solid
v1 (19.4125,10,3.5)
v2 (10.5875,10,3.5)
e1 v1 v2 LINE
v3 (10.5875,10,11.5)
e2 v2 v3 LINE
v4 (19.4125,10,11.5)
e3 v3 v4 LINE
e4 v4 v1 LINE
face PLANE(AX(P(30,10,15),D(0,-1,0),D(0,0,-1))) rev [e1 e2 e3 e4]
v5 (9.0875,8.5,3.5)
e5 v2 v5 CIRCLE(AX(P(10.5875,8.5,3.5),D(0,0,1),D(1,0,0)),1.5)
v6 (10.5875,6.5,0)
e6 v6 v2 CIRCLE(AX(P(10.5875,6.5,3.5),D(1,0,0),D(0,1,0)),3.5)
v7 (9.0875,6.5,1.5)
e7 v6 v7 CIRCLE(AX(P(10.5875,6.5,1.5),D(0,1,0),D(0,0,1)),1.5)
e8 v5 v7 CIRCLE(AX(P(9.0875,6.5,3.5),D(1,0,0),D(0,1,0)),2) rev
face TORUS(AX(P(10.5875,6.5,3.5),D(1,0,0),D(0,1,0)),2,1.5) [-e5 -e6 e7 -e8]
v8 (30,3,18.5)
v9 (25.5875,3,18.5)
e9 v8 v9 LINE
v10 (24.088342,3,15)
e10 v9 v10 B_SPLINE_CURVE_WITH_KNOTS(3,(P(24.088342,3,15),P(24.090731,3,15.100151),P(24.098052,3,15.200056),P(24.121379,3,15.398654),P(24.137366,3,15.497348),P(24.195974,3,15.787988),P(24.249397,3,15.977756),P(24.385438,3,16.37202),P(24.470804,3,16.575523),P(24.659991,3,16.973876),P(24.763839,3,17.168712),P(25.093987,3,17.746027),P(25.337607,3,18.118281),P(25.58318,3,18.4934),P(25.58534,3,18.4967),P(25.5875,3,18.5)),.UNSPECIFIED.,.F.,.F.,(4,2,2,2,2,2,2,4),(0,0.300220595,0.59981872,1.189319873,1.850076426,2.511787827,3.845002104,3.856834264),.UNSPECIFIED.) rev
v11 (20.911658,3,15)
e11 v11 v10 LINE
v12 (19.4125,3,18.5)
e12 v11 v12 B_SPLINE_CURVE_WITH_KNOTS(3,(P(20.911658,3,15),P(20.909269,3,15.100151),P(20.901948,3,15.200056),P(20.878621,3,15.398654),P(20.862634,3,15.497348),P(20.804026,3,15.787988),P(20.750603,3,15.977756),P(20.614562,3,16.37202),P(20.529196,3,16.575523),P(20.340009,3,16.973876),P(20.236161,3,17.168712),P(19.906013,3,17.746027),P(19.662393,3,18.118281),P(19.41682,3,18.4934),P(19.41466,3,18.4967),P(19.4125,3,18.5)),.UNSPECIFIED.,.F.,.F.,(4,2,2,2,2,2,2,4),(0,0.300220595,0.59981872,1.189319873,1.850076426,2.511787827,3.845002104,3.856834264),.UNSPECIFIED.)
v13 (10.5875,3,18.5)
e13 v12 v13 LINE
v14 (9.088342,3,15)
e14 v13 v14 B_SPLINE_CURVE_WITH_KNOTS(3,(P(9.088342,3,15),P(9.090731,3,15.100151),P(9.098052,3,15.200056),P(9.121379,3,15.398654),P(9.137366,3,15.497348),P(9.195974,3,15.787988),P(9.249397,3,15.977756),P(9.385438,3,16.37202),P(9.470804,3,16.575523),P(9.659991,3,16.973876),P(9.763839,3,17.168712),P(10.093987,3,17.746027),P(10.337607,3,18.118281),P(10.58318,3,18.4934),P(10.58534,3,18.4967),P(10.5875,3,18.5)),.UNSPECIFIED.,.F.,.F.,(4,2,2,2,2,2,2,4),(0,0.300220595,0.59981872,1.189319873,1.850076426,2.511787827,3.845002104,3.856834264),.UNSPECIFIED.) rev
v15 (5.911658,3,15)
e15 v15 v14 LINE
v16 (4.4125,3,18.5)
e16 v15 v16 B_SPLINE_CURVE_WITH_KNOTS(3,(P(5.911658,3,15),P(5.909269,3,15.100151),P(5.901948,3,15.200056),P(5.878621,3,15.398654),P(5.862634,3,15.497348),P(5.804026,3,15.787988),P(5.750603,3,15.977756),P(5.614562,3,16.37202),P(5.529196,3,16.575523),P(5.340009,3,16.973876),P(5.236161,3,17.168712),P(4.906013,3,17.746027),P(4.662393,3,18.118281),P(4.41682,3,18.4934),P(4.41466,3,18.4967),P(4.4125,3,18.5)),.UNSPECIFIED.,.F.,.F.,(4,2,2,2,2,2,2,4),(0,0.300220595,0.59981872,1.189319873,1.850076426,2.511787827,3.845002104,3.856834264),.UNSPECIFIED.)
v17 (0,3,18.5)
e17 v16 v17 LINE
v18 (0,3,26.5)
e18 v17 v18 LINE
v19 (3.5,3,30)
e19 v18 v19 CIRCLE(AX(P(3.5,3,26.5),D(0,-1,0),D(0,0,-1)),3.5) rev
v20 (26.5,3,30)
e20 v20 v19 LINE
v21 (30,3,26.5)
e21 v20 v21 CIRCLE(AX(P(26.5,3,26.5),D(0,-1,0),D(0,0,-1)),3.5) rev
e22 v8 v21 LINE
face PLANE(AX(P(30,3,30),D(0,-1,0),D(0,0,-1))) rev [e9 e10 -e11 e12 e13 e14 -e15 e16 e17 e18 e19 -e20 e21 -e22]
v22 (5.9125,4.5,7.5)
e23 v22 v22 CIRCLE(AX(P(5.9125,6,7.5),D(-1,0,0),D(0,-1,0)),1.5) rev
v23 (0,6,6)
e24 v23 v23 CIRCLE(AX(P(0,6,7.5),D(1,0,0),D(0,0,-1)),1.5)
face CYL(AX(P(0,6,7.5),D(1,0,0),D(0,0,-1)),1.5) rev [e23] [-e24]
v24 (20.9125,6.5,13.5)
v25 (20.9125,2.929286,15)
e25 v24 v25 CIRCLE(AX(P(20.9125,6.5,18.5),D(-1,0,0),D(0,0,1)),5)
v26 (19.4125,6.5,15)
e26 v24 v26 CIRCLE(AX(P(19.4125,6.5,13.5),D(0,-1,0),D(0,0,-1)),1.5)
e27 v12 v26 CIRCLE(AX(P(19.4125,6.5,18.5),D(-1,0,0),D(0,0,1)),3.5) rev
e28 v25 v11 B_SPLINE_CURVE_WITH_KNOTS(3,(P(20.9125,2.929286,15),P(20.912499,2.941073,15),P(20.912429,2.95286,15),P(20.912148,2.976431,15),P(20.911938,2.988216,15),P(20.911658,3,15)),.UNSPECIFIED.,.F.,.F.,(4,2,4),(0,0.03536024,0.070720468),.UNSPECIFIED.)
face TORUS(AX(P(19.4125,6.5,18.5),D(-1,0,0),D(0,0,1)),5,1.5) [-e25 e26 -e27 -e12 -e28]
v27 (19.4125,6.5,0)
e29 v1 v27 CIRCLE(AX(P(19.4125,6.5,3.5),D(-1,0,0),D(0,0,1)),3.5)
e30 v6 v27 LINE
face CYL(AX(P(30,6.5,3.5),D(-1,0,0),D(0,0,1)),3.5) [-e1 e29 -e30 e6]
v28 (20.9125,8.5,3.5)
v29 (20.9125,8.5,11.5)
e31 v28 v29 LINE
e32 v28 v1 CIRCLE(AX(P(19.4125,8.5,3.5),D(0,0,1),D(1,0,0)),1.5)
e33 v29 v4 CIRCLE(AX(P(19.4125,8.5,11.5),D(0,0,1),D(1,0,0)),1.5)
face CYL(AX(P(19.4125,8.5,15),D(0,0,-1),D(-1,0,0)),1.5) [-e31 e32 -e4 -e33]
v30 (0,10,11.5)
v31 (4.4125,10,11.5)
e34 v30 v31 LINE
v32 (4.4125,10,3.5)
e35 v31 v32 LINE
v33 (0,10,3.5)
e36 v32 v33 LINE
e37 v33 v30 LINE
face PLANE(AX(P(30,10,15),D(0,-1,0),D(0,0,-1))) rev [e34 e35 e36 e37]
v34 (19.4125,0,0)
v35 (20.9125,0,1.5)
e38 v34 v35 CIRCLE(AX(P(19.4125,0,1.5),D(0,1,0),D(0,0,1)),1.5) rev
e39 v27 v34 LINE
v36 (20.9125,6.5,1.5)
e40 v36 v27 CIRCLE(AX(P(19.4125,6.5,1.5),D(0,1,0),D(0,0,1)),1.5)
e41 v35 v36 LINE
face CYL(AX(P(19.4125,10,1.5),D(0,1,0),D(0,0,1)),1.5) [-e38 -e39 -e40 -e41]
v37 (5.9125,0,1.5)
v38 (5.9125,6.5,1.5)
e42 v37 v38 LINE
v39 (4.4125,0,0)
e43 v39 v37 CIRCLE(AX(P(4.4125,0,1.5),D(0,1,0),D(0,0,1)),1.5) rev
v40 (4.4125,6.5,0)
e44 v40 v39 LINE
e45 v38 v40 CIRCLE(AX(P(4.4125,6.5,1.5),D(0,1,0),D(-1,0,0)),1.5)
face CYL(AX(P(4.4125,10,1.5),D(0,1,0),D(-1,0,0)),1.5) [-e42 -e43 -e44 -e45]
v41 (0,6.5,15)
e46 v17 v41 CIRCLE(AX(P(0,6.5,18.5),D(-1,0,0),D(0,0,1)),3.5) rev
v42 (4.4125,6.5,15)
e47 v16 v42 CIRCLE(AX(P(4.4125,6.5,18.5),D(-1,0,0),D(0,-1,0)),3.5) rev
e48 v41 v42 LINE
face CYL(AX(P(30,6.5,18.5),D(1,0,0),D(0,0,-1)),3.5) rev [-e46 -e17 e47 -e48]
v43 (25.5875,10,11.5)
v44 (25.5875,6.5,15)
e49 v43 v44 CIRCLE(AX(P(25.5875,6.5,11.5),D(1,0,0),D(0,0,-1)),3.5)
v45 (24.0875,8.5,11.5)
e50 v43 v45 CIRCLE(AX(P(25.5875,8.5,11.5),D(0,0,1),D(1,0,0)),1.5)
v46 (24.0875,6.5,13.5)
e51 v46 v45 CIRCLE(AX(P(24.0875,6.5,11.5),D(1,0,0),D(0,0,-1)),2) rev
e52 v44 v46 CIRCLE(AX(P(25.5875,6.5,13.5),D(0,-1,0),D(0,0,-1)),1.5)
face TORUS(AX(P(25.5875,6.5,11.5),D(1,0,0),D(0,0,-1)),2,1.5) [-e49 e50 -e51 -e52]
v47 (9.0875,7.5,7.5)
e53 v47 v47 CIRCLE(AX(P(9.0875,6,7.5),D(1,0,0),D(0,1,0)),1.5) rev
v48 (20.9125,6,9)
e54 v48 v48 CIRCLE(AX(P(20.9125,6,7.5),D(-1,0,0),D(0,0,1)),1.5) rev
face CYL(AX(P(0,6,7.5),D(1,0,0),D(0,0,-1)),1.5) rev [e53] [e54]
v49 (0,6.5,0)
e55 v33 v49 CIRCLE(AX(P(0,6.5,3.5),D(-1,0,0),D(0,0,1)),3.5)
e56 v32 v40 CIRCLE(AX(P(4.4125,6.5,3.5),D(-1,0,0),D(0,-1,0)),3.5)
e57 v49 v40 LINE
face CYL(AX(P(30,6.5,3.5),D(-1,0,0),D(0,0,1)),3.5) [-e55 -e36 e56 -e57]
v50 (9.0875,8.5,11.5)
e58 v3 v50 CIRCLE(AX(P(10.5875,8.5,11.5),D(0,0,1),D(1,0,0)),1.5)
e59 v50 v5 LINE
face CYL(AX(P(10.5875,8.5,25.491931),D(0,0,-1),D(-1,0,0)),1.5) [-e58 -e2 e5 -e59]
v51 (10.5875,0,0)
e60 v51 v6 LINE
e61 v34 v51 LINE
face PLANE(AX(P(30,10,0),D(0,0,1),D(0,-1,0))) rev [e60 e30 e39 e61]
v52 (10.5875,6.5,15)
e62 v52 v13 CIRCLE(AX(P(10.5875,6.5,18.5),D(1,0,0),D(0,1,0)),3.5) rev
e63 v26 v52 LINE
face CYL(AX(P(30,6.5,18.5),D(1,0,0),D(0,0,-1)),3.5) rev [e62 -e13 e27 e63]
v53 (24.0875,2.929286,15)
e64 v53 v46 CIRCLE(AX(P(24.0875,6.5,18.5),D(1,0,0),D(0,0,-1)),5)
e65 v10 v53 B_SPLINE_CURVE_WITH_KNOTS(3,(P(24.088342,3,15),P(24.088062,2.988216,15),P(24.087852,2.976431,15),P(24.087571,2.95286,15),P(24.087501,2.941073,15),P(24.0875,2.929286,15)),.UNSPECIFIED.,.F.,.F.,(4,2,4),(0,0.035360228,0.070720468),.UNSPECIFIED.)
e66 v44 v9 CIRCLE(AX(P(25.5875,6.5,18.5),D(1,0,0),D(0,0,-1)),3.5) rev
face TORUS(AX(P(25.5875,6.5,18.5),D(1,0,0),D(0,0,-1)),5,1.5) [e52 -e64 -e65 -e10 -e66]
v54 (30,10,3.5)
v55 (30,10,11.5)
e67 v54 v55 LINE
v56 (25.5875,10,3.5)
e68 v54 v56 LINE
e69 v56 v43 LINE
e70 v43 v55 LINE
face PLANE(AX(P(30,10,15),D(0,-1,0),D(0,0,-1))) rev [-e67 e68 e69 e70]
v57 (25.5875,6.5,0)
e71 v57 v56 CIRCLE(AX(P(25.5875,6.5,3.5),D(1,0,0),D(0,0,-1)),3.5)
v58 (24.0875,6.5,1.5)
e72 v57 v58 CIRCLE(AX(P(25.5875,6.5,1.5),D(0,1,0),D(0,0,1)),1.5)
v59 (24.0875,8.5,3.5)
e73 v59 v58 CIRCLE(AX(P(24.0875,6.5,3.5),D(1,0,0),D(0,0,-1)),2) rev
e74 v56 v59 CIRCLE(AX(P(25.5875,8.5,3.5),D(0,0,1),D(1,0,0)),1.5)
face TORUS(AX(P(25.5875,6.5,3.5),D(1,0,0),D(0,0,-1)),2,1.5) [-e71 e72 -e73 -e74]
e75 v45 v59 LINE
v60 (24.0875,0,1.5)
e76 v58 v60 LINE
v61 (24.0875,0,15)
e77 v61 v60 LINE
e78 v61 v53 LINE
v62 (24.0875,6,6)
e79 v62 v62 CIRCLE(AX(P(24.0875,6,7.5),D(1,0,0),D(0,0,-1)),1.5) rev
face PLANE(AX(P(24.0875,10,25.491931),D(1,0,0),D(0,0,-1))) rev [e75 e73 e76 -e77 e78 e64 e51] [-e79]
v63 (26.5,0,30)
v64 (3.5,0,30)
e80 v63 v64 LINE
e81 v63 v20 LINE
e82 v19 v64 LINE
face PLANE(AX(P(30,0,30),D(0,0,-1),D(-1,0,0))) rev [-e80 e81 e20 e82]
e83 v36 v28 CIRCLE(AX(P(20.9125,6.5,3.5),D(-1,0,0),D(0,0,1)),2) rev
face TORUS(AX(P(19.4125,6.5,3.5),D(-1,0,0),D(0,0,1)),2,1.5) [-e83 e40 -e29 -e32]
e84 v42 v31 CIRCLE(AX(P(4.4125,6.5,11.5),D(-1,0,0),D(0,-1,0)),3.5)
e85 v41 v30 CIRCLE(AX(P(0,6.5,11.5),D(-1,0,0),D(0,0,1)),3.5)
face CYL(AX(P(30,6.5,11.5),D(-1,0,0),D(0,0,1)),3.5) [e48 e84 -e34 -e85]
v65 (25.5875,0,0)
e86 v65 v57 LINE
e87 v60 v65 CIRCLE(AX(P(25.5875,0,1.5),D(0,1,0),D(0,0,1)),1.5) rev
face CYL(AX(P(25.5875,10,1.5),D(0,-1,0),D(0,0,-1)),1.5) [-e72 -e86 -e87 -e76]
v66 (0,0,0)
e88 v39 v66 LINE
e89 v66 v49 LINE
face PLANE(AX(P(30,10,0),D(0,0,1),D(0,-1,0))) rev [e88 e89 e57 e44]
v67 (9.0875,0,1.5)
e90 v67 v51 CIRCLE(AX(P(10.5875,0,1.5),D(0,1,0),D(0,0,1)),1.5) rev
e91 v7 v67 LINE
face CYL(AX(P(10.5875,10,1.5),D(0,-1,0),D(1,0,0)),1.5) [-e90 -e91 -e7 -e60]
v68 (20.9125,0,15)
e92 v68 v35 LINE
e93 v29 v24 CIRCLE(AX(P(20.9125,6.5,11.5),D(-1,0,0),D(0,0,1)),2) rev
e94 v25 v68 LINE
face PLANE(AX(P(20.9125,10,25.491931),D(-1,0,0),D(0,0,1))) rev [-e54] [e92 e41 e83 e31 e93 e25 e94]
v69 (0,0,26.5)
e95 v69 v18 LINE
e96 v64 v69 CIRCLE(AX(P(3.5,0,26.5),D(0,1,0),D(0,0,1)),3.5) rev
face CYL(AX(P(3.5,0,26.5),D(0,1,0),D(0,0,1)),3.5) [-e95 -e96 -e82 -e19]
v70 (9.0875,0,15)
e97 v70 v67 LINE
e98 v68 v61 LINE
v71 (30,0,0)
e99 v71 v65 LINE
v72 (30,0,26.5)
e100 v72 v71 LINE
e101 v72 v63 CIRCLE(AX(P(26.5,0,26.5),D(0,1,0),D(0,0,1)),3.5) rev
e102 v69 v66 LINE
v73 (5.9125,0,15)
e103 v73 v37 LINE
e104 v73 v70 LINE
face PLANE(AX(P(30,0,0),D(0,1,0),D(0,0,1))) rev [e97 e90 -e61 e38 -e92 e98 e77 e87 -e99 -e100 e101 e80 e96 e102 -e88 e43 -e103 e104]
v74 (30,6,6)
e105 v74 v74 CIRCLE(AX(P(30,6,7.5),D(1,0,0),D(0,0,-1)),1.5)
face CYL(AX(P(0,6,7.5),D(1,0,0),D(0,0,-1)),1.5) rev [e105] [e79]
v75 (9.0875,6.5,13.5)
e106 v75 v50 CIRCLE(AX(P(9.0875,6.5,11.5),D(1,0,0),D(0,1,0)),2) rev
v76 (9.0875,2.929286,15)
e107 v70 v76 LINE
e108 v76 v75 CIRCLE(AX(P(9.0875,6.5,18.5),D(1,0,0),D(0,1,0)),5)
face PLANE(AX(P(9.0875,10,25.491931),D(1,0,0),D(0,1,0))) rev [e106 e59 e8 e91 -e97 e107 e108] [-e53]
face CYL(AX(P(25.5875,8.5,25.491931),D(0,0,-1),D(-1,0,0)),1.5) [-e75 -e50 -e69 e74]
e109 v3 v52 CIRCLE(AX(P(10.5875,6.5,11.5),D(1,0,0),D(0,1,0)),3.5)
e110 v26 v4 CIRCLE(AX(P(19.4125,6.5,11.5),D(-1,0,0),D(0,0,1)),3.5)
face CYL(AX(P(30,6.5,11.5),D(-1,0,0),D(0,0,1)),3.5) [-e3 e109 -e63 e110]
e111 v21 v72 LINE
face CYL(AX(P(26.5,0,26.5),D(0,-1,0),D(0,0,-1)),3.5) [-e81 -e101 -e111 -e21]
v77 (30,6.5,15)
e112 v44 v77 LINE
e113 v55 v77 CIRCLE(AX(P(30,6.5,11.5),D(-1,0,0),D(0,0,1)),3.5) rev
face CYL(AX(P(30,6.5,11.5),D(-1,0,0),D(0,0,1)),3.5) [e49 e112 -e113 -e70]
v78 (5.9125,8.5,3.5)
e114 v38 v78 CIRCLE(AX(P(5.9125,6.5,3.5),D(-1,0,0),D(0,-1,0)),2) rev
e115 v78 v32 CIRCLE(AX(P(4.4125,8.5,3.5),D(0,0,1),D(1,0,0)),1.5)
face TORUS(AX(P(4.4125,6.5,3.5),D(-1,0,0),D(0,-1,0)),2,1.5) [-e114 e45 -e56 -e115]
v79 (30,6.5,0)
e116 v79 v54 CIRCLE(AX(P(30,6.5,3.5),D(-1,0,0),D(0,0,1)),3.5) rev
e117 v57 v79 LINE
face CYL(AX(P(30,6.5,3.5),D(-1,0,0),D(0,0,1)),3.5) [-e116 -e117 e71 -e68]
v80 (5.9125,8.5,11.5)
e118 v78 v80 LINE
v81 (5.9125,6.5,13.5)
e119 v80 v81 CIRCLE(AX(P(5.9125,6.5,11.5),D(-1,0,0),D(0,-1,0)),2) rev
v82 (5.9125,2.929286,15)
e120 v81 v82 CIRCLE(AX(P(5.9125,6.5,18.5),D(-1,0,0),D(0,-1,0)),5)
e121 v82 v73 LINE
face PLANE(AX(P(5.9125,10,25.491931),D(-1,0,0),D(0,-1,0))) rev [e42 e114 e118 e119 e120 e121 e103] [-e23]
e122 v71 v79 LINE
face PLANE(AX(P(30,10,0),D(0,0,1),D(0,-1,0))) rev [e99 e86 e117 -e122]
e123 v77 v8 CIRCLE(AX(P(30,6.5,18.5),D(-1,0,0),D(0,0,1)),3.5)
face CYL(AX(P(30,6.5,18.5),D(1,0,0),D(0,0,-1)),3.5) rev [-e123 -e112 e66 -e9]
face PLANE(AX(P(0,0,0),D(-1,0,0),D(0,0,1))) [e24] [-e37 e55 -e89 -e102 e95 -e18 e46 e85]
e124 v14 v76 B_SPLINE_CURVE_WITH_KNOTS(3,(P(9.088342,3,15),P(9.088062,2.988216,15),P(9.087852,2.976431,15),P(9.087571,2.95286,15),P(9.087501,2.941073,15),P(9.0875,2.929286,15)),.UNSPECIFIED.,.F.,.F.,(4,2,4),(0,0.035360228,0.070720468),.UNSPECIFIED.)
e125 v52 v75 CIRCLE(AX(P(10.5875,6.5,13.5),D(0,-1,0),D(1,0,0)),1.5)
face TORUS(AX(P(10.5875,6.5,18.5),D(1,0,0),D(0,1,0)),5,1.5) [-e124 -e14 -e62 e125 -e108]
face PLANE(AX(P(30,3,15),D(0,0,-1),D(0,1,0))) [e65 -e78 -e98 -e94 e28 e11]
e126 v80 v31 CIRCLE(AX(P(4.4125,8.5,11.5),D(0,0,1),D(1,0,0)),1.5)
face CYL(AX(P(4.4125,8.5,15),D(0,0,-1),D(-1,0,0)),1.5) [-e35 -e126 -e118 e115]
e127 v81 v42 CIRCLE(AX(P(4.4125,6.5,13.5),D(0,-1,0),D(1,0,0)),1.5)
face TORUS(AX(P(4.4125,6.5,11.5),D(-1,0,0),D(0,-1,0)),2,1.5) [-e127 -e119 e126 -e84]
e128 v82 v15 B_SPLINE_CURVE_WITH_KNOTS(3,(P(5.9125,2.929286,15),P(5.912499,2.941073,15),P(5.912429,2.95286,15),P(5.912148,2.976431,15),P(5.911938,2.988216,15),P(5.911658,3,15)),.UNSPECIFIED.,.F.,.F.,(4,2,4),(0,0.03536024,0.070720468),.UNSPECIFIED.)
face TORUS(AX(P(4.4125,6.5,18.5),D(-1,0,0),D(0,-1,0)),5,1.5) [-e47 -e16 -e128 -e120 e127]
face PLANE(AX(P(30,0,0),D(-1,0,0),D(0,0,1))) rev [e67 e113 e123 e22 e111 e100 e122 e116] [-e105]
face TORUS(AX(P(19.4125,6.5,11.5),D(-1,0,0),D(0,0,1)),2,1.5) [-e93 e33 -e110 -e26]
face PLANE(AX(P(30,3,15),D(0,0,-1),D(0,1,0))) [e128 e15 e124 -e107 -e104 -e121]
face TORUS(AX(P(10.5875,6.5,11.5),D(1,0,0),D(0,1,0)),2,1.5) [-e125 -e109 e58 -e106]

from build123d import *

# Parameters (mm, degrees)
BOSS_EXTRUDE1_DEPTH = 30
SKETCH2_R           = 1.5
CUT_EXTRUDE1_DEPTH  = 44.588989435
CUT_EXTRUDE2_REACH  = 45.589
SKETCH3_W           = 3.175
SKETCH3_H           = 10
FILLET1_R           = 3.5
FILLET2_R           = 1.5


# Some blends are built 0.0001 mm under size
with BuildPart() as part:
    # Sketch1 → Boss-Extrude1 (new body)
    with BuildSketch(Plane(origin=(0, 0, 0), x_dir=(0, 0, -1), z_dir=(1, 0, 0))):
        Polygon((0, 0), (-30, 0), (-30, 3), (-15, 3), (-15, 10), (0, 10), align=None)
    extrude(amount=BOSS_EXTRUDE1_DEPTH)

    # Sketch2 → Cut-Extrude1 (cut, through all)
    with BuildSketch(Plane(origin=(30, 0, 0), x_dir=(0, 0, -1), z_dir=(1, 0, 0))):
        with Locations((-7.5, 6)):
            Circle(SKETCH2_R)
    extrude(amount=-CUT_EXTRUDE1_DEPTH, mode=Mode.SUBTRACT)

    # Cut-Extrude2: up to this face of the body (flat: up to its plane)
    cut_extrude2_end = Plane(part.part.faces().sort_by_distance((15, 6.5, 15))[0])
    # Sketch3 → Cut-Extrude2 (cut, up to the picked face)
    with BuildSketch(Plane(origin=(0, 0, 0), x_dir=(-1, 0, 0), z_dir=(0, 0, -1)), mode=Mode.PRIVATE) as cut_extrude2_sk1:
        with Locations((-7.5, 5)):
            Rectangle(SKETCH3_W, SKETCH3_H)
    cut_extrude2_tool1 = split(extrude(cut_extrude2_sk1.sketch, amount=-CUT_EXTRUDE2_REACH, mode=Mode.PRIVATE), bisect_by=cut_extrude2_end, keep=Keep.BOTH, mode=Mode.PRIVATE)
    # Sketch3 → Cut-Extrude2 (cut, up to the picked face)
    with BuildSketch(Plane(origin=(0, 0, 0), x_dir=(-1, 0, 0), z_dir=(0, 0, -1)), mode=Mode.PRIVATE) as cut_extrude2_sk2:
        with Locations((-22.5, 5)):
            Rectangle(SKETCH3_W, SKETCH3_H)
    cut_extrude2_tool2 = split(extrude(cut_extrude2_sk2.sketch, amount=-CUT_EXTRUDE2_REACH, mode=Mode.PRIVATE), bisect_by=cut_extrude2_end, keep=Keep.BOTH, mode=Mode.PRIVATE)
    add(cut_extrude2_tool1.solids().sort_by(Axis((7.5, 5, 0), (0, 0, 1)))[0], mode=Mode.SUBTRACT)
    add(cut_extrude2_tool2.solids().sort_by(Axis((22.5, 5, 0), (0, 0, 1)))[0], mode=Mode.SUBTRACT)

    # Fillet1
    fillet1_edges = [part.edges().sort_by_distance(p)[0] for p in [
        (0, 1.5, 30),
        (30, 1.5, 30),
        (15, 10, 0),
        (15, 3, 15),
        (15, 10, 15),
        (2.95625, 10, 0),
        (27.04375, 10, 0),
        (2.95625, 10, 15),
        (27.04375, 10, 15),
        (27.04375, 3, 15),
        (2.95625, 3, 15),
    ]]
    fillet(fillet1_edges, radius=FILLET1_R - 0.0001)  # a hair under: the kernel refuses the full size

    # Fillet2
    # the kernel refuses this fillet: 1.5 mm, written as the material it takes off along each edge
    with BuildSketch(Plane(origin=(5.9125, 6.4999, 18.4999), x_dir=(0, -0.4784658161489802, 0.87810617967128), z_dir=(0, 0.87810617967128, 0.4784658161489802))) as fillet2_piece_1_section:
        with BuildLine():
            CenterArc((3.4999 + FILLET2_R, -FILLET2_R), FILLET2_R, 90, 90)
            Line((3.4999, -FILLET2_R), (3.4999, 0))
            Line((3.4999, 0), (3.4999 + FILLET2_R, 0))
        make_face()
    fillet2_piece_1 = revolve(axis=Axis((5.9125, 6.4999, 18.4999), (1, 0, 0)), revolution_arc=151.414750095, mode=Mode.PRIVATE)
    fillet2_piece_1 = split(fillet2_piece_1, bisect_by=Plane(origin=(5.513661533, 3, 15.961303767), z_dir=(0, 1, 0)), keep=Keep.TOP, mode=Mode.PRIVATE)
    add(fillet2_piece_1, mode=Mode.SUBTRACT)
    with BuildSketch(Plane(origin=(5.9125, 6.4999, 18.4999), x_dir=(0, -0.4784658161489802, 0.87810617967128), z_dir=(0, 0.87810617967128, 0.4784658161489802))) as fillet2_piece_2_section:
        with BuildLine():
            CenterArc((3.4999 + FILLET2_R, -FILLET2_R), FILLET2_R, 90, 90)
            Line((3.4999, -FILLET2_R), (3.4999, 0))
            Line((3.4999, 0), (3.4999 + FILLET2_R, 0))
        make_face()
    fillet2_piece_2 = revolve(axis=Axis((5.9125, 6.4999, 18.4999), (1, 0, 0)), revolution_arc=151.414750095, mode=Mode.PRIVATE)
    fillet2_piece_2 = split(fillet2_piece_2, bisect_by=Plane(origin=(5.912331241, 2.985794163, 15), z_dir=(0, 0, -1)), keep=Keep.TOP, mode=Mode.PRIVATE)
    add(fillet2_piece_2, mode=Mode.SUBTRACT)
    with BuildSketch(Plane(origin=(5.9125, 6.5001, 11.5001), x_dir=(0, 1, 0), z_dir=(0, 0, -1))) as fillet2_piece_3:
        with BuildLine():
            CenterArc((3.4999 - FILLET2_R, -FILLET2_R), FILLET2_R, 360, 90)
            Line((3.4999, -FILLET2_R), (3.4999, 0))
            Line((3.4999, 0), (3.4999 - FILLET2_R, 0))
        make_face()
    revolve(axis=Axis((5.9125, 6.5001, 11.5001), (1, 0, 0)), revolution_arc=90, mode=Mode.SUBTRACT)
    with BuildSketch(Plane(origin=(5.9125, 6.5001, 0), x_dir=(-1, 0, 0), z_dir=(0, -1, 0)), Plane(origin=(24.0875, -3.75, 0), x_dir=(1, 0, 0), z_dir=(0, 1, 0)), Plane(origin=(20.9125, 6.5001, 0), x_dir=(-1, 0, 0), z_dir=(0, -1, 0))) as fillet2_piece_4:
        with BuildLine():
            CenterArc((FILLET2_R, -FILLET2_R), FILLET2_R, 90, 90)
            Line((0, -FILLET2_R), (0, 0))
            Line((0, 0), (FILLET2_R, 0))
        make_face()
    extrude(amount=10.2501, mode=Mode.SUBTRACT)
    with BuildSketch(Plane(origin=(5.9125, 6.5001, 3.4999), x_dir=(0, 0, -1), z_dir=(0, -1, 0))) as fillet2_piece_5:
        with BuildLine():
            CenterArc((3.4999 - FILLET2_R, -FILLET2_R), FILLET2_R, 0, 90)
            Line((3.4999, -FILLET2_R), (3.4999, 0))
            Line((3.4999, 0), (3.4999 - FILLET2_R, 0))
        make_face()
    revolve(axis=Axis((5.9125, 6.5001, 3.4999), (1, 0, 0)), revolution_arc=90, mode=Mode.SUBTRACT)
    with BuildSketch(Plane(origin=(9.0875, 6.4999, 18.4999), x_dir=(0, -0.478465816148981, 0.8781061796712796), z_dir=(0, 0.8781061796712796, 0.478465816148981))) as fillet2_piece_6_section:
        with BuildLine():
            CenterArc((3.4999 + FILLET2_R, FILLET2_R), FILLET2_R, 180, 90)
            Line((3.4999, FILLET2_R), (3.4999, 0))
            Line((3.4999, 0), (3.4999 + FILLET2_R, 0))
        make_face()
    fillet2_piece_6 = revolve(axis=Axis((9.0875, 6.4999, 18.4999), (1, 0, 0)), revolution_arc=151.414750095, mode=Mode.PRIVATE)
    fillet2_piece_6 = split(fillet2_piece_6, bisect_by=Plane(origin=(9.486338509, 3, 15.961303608), z_dir=(0, 1, 0)), keep=Keep.TOP, mode=Mode.PRIVATE)
    add(fillet2_piece_6, mode=Mode.SUBTRACT)
    with BuildSketch(Plane(origin=(9.0875, 6.4999, 18.4999), x_dir=(0, -0.478465816148981, 0.8781061796712796), z_dir=(0, 0.8781061796712796, 0.478465816148981))) as fillet2_piece_7_section:
        with BuildLine():
            CenterArc((3.4999 + FILLET2_R, FILLET2_R), FILLET2_R, 180, 90)
            Line((3.4999, FILLET2_R), (3.4999, 0))
            Line((3.4999, 0), (3.4999 + FILLET2_R, 0))
        make_face()
    fillet2_piece_7 = revolve(axis=Axis((9.0875, 6.4999, 18.4999), (1, 0, 0)), revolution_arc=151.414750095, mode=Mode.PRIVATE)
    fillet2_piece_7 = split(fillet2_piece_7, bisect_by=Plane(origin=(9.087668759, 2.985794163, 15), z_dir=(0, 0, -1)), keep=Keep.TOP, mode=Mode.PRIVATE)
    add(fillet2_piece_7, mode=Mode.SUBTRACT)
    with BuildSketch(Plane(origin=(9.0875, 6.5001, 11.5001), x_dir=(0, 1, 0), z_dir=(0, 0, -1))) as fillet2_piece_8:
        with BuildLine():
            CenterArc((3.4999 - FILLET2_R, FILLET2_R), FILLET2_R, 270, 90)
            Line((3.4999, FILLET2_R), (3.4999, 0))
            Line((3.4999, 0), (3.4999 - FILLET2_R, 0))
        make_face()
    revolve(axis=Axis((9.0875, 6.5001, 11.5001), (1, 0, 0)), revolution_arc=90, mode=Mode.SUBTRACT)
    with BuildSketch(Plane(origin=(9.0875, -3.75, 0), x_dir=(0, 0, 1), z_dir=(0, 1, 0))) as fillet2_piece_9:
        with BuildLine():
            CenterArc((FILLET2_R, FILLET2_R), FILLET2_R, 180, 90)
            Line((0, FILLET2_R), (0, 0))
            Line((0, 0), (FILLET2_R, 0))
        make_face()
    extrude(amount=10.2501, mode=Mode.SUBTRACT)
    with BuildSketch(Plane(origin=(9.0875, 6.5001, 3.4999), x_dir=(0, 0, -1), z_dir=(0, -1, 0))) as fillet2_piece_10:
        with BuildLine():
            CenterArc((3.4999 - FILLET2_R, FILLET2_R), FILLET2_R, 270, 90)
            Line((3.4999, FILLET2_R), (3.4999, 0))
            Line((3.4999, 0), (3.4999 - FILLET2_R, 0))
        make_face()
    revolve(axis=Axis((9.0875, 6.5001, 3.4999), (1, 0, 0)), revolution_arc=90, mode=Mode.SUBTRACT)
    with BuildSketch(Plane(origin=(24.0875, 6.4999, 18.4999), x_dir=(0, -0.478465816148981, 0.8781061796712796), z_dir=(0, 0.8781061796712796, 0.478465816148981))) as fillet2_piece_11_section:
        with BuildLine():
            CenterArc((3.4999 + FILLET2_R, FILLET2_R), FILLET2_R, 180, 90)
            Line((3.4999, FILLET2_R), (3.4999, 0))
            Line((3.4999, 0), (3.4999 + FILLET2_R, 0))
        make_face()
    fillet2_piece_11 = revolve(axis=Axis((24.0875, 6.4999, 18.4999), (1, 0, 0)), revolution_arc=151.414750095, mode=Mode.PRIVATE)
    fillet2_piece_11 = split(fillet2_piece_11, bisect_by=Plane(origin=(24.486338467, 3, 15.961303767), z_dir=(0, 1, 0)), keep=Keep.TOP, mode=Mode.PRIVATE)
    add(fillet2_piece_11, mode=Mode.SUBTRACT)
    with BuildSketch(Plane(origin=(24.0875, 6.4999, 18.4999), x_dir=(0, -0.478465816148981, 0.8781061796712796), z_dir=(0, 0.8781061796712796, 0.478465816148981))) as fillet2_piece_12_section:
        with BuildLine():
            CenterArc((3.4999 + FILLET2_R, FILLET2_R), FILLET2_R, 180, 90)
            Line((3.4999, FILLET2_R), (3.4999, 0))
            Line((3.4999, 0), (3.4999 + FILLET2_R, 0))
        make_face()
    fillet2_piece_12 = revolve(axis=Axis((24.0875, 6.4999, 18.4999), (1, 0, 0)), revolution_arc=151.414750095, mode=Mode.PRIVATE)
    fillet2_piece_12 = split(fillet2_piece_12, bisect_by=Plane(origin=(24.087668759, 2.985794163, 15), z_dir=(0, 0, -1)), keep=Keep.TOP, mode=Mode.PRIVATE)
    add(fillet2_piece_12, mode=Mode.SUBTRACT)
    with BuildSketch(Plane(origin=(24.0875, 6.5001, 11.5001), x_dir=(0, 1, 0), z_dir=(0, 0, -1))) as fillet2_piece_13:
        with BuildLine():
            CenterArc((3.4999 - FILLET2_R, FILLET2_R), FILLET2_R, 270, 90)
            Line((3.4999, FILLET2_R), (3.4999, 0))
            Line((3.4999, 0), (3.4999 - FILLET2_R, 0))
        make_face()
    revolve(axis=Axis((24.0875, 6.5001, 11.5001), (1, 0, 0)), revolution_arc=90, mode=Mode.SUBTRACT)
    with BuildSketch(Plane(origin=(24.0875, 6.5001, 3.4999), x_dir=(0, 0, -1), z_dir=(0, -1, 0))) as fillet2_piece_14:
        with BuildLine():
            CenterArc((3.4999 - FILLET2_R, FILLET2_R), FILLET2_R, 270, 90)
            Line((3.4999, FILLET2_R), (3.4999, 0))
            Line((3.4999, 0), (3.4999 - FILLET2_R, 0))
        make_face()
    revolve(axis=Axis((24.0875, 6.5001, 3.4999), (1, 0, 0)), revolution_arc=90, mode=Mode.SUBTRACT)
    with BuildSketch(Plane(origin=(20.9125, 6.4999, 18.4999), x_dir=(0, -0.478465816148981, 0.8781061796712796), z_dir=(0, 0.8781061796712796, 0.478465816148981))) as fillet2_piece_15_section:
        with BuildLine():
            CenterArc((3.4999 + FILLET2_R, -FILLET2_R), FILLET2_R, 90, 90)
            Line((3.4999, -FILLET2_R), (3.4999, 0))
            Line((3.4999, 0), (3.4999 + FILLET2_R, 0))
        make_face()
    fillet2_piece_15 = revolve(axis=Axis((20.9125, 6.4999, 18.4999), (1, 0, 0)), revolution_arc=151.414750095, mode=Mode.PRIVATE)
    fillet2_piece_15 = split(fillet2_piece_15, bisect_by=Plane(origin=(20.513661491, 3, 15.961303608), z_dir=(0, 1, 0)), keep=Keep.TOP, mode=Mode.PRIVATE)
    add(fillet2_piece_15, mode=Mode.SUBTRACT)
    with BuildSketch(Plane(origin=(20.9125, 6.4999, 18.4999), x_dir=(0, -0.478465816148981, 0.8781061796712796), z_dir=(0, 0.8781061796712796, 0.478465816148981))) as fillet2_piece_16_section:
        with BuildLine():
            CenterArc((3.4999 + FILLET2_R, -FILLET2_R), FILLET2_R, 90, 90)
            Line((3.4999, -FILLET2_R), (3.4999, 0))
            Line((3.4999, 0), (3.4999 + FILLET2_R, 0))
        make_face()
    fillet2_piece_16 = revolve(axis=Axis((20.9125, 6.4999, 18.4999), (1, 0, 0)), revolution_arc=151.414750095, mode=Mode.PRIVATE)
    fillet2_piece_16 = split(fillet2_piece_16, bisect_by=Plane(origin=(20.912331241, 2.985794163, 15), z_dir=(0, 0, -1)), keep=Keep.TOP, mode=Mode.PRIVATE)
    add(fillet2_piece_16, mode=Mode.SUBTRACT)
    with BuildSketch(Plane(origin=(20.9125, 6.5001, 11.5001), x_dir=(0, 1, 0), z_dir=(0, 0, -1))) as fillet2_piece_17:
        with BuildLine():
            CenterArc((3.4999 - FILLET2_R, -FILLET2_R), FILLET2_R, 0, 90)
            Line((3.4999, -FILLET2_R), (3.4999, 0))
            Line((3.4999, 0), (3.4999 - FILLET2_R, 0))
        make_face()
    revolve(axis=Axis((20.9125, 6.5001, 11.5001), (1, 0, 0)), revolution_arc=90, mode=Mode.SUBTRACT)
    with BuildSketch(Plane(origin=(20.9125, 6.5001, 3.4999), x_dir=(0, 0, -1), z_dir=(0, -1, 0))) as fillet2_piece_18:
        with BuildLine():
            CenterArc((3.4999 - FILLET2_R, -FILLET2_R), FILLET2_R, 0, 90)
            Line((3.4999, -FILLET2_R), (3.4999, 0))
            Line((3.4999, 0), (3.4999 - FILLET2_R, 0))
        make_face()
    revolve(axis=Axis((20.9125, 6.5001, 3.4999), (1, 0, 0)), revolution_arc=90, mode=Mode.SUBTRACT)
    with BuildSketch(Plane(origin=(5.9125, 10, 3.4999), x_dir=(0, -1, 0), z_dir=(0, 0, 1)), Plane(origin=(20.9125, 10, 3.4999), x_dir=(0, -1, 0), z_dir=(0, 0, 1))) as fillet2_piece_19:
        with BuildLine():
            CenterArc((FILLET2_R, -FILLET2_R), FILLET2_R, 90, 90)
            Line((0, -FILLET2_R), (0, 0))
            Line((0, 0), (FILLET2_R, 0))
        make_face()
    extrude(amount=8.0002, mode=Mode.SUBTRACT)
    with BuildSketch(Plane(origin=(9.0875, 10, 3.4999), x_dir=(0, -1, 0), z_dir=(0, 0, 1)), Plane(origin=(24.0875, 10, 3.4999), x_dir=(0, -1, 0), z_dir=(0, 0, 1))) as fillet2_piece_20:
        with BuildLine():
            CenterArc((FILLET2_R, FILLET2_R), FILLET2_R, 180, 90)
            Line((0, FILLET2_R), (0, 0))
            Line((0, 0), (FILLET2_R, 0))
        make_face()
    extrude(amount=8.0002, mode=Mode.SUBTRACT)
    with BuildSketch(Plane(origin=(20.9125, 6.5001, 15), x_dir=(0, 0, -1), z_dir=(0, -1, 0)), Plane(origin=(24.0875, 6.4999, 15), x_dir=(0, 0, -1), z_dir=(0, 1, 0)), Plane(origin=(9.0875, 6.4999, 15), x_dir=(0, 0, -1), z_dir=(0, 1, 0)), Plane(origin=(5.9125, 6.5001, 15), x_dir=(0, 0, -1), z_dir=(0, -1, 0))) as fillet2_piece_21:
        with BuildLine():
            CenterArc((FILLET2_R, -FILLET2_R), FILLET2_R, 90, 90)
            Line((0, -FILLET2_R), (0, 0))
            Line((0, 0), (FILLET2_R, 0))
        make_face()
    extrude(amount=0.0002, mode=Mode.SUBTRACT)


solid = part.part
